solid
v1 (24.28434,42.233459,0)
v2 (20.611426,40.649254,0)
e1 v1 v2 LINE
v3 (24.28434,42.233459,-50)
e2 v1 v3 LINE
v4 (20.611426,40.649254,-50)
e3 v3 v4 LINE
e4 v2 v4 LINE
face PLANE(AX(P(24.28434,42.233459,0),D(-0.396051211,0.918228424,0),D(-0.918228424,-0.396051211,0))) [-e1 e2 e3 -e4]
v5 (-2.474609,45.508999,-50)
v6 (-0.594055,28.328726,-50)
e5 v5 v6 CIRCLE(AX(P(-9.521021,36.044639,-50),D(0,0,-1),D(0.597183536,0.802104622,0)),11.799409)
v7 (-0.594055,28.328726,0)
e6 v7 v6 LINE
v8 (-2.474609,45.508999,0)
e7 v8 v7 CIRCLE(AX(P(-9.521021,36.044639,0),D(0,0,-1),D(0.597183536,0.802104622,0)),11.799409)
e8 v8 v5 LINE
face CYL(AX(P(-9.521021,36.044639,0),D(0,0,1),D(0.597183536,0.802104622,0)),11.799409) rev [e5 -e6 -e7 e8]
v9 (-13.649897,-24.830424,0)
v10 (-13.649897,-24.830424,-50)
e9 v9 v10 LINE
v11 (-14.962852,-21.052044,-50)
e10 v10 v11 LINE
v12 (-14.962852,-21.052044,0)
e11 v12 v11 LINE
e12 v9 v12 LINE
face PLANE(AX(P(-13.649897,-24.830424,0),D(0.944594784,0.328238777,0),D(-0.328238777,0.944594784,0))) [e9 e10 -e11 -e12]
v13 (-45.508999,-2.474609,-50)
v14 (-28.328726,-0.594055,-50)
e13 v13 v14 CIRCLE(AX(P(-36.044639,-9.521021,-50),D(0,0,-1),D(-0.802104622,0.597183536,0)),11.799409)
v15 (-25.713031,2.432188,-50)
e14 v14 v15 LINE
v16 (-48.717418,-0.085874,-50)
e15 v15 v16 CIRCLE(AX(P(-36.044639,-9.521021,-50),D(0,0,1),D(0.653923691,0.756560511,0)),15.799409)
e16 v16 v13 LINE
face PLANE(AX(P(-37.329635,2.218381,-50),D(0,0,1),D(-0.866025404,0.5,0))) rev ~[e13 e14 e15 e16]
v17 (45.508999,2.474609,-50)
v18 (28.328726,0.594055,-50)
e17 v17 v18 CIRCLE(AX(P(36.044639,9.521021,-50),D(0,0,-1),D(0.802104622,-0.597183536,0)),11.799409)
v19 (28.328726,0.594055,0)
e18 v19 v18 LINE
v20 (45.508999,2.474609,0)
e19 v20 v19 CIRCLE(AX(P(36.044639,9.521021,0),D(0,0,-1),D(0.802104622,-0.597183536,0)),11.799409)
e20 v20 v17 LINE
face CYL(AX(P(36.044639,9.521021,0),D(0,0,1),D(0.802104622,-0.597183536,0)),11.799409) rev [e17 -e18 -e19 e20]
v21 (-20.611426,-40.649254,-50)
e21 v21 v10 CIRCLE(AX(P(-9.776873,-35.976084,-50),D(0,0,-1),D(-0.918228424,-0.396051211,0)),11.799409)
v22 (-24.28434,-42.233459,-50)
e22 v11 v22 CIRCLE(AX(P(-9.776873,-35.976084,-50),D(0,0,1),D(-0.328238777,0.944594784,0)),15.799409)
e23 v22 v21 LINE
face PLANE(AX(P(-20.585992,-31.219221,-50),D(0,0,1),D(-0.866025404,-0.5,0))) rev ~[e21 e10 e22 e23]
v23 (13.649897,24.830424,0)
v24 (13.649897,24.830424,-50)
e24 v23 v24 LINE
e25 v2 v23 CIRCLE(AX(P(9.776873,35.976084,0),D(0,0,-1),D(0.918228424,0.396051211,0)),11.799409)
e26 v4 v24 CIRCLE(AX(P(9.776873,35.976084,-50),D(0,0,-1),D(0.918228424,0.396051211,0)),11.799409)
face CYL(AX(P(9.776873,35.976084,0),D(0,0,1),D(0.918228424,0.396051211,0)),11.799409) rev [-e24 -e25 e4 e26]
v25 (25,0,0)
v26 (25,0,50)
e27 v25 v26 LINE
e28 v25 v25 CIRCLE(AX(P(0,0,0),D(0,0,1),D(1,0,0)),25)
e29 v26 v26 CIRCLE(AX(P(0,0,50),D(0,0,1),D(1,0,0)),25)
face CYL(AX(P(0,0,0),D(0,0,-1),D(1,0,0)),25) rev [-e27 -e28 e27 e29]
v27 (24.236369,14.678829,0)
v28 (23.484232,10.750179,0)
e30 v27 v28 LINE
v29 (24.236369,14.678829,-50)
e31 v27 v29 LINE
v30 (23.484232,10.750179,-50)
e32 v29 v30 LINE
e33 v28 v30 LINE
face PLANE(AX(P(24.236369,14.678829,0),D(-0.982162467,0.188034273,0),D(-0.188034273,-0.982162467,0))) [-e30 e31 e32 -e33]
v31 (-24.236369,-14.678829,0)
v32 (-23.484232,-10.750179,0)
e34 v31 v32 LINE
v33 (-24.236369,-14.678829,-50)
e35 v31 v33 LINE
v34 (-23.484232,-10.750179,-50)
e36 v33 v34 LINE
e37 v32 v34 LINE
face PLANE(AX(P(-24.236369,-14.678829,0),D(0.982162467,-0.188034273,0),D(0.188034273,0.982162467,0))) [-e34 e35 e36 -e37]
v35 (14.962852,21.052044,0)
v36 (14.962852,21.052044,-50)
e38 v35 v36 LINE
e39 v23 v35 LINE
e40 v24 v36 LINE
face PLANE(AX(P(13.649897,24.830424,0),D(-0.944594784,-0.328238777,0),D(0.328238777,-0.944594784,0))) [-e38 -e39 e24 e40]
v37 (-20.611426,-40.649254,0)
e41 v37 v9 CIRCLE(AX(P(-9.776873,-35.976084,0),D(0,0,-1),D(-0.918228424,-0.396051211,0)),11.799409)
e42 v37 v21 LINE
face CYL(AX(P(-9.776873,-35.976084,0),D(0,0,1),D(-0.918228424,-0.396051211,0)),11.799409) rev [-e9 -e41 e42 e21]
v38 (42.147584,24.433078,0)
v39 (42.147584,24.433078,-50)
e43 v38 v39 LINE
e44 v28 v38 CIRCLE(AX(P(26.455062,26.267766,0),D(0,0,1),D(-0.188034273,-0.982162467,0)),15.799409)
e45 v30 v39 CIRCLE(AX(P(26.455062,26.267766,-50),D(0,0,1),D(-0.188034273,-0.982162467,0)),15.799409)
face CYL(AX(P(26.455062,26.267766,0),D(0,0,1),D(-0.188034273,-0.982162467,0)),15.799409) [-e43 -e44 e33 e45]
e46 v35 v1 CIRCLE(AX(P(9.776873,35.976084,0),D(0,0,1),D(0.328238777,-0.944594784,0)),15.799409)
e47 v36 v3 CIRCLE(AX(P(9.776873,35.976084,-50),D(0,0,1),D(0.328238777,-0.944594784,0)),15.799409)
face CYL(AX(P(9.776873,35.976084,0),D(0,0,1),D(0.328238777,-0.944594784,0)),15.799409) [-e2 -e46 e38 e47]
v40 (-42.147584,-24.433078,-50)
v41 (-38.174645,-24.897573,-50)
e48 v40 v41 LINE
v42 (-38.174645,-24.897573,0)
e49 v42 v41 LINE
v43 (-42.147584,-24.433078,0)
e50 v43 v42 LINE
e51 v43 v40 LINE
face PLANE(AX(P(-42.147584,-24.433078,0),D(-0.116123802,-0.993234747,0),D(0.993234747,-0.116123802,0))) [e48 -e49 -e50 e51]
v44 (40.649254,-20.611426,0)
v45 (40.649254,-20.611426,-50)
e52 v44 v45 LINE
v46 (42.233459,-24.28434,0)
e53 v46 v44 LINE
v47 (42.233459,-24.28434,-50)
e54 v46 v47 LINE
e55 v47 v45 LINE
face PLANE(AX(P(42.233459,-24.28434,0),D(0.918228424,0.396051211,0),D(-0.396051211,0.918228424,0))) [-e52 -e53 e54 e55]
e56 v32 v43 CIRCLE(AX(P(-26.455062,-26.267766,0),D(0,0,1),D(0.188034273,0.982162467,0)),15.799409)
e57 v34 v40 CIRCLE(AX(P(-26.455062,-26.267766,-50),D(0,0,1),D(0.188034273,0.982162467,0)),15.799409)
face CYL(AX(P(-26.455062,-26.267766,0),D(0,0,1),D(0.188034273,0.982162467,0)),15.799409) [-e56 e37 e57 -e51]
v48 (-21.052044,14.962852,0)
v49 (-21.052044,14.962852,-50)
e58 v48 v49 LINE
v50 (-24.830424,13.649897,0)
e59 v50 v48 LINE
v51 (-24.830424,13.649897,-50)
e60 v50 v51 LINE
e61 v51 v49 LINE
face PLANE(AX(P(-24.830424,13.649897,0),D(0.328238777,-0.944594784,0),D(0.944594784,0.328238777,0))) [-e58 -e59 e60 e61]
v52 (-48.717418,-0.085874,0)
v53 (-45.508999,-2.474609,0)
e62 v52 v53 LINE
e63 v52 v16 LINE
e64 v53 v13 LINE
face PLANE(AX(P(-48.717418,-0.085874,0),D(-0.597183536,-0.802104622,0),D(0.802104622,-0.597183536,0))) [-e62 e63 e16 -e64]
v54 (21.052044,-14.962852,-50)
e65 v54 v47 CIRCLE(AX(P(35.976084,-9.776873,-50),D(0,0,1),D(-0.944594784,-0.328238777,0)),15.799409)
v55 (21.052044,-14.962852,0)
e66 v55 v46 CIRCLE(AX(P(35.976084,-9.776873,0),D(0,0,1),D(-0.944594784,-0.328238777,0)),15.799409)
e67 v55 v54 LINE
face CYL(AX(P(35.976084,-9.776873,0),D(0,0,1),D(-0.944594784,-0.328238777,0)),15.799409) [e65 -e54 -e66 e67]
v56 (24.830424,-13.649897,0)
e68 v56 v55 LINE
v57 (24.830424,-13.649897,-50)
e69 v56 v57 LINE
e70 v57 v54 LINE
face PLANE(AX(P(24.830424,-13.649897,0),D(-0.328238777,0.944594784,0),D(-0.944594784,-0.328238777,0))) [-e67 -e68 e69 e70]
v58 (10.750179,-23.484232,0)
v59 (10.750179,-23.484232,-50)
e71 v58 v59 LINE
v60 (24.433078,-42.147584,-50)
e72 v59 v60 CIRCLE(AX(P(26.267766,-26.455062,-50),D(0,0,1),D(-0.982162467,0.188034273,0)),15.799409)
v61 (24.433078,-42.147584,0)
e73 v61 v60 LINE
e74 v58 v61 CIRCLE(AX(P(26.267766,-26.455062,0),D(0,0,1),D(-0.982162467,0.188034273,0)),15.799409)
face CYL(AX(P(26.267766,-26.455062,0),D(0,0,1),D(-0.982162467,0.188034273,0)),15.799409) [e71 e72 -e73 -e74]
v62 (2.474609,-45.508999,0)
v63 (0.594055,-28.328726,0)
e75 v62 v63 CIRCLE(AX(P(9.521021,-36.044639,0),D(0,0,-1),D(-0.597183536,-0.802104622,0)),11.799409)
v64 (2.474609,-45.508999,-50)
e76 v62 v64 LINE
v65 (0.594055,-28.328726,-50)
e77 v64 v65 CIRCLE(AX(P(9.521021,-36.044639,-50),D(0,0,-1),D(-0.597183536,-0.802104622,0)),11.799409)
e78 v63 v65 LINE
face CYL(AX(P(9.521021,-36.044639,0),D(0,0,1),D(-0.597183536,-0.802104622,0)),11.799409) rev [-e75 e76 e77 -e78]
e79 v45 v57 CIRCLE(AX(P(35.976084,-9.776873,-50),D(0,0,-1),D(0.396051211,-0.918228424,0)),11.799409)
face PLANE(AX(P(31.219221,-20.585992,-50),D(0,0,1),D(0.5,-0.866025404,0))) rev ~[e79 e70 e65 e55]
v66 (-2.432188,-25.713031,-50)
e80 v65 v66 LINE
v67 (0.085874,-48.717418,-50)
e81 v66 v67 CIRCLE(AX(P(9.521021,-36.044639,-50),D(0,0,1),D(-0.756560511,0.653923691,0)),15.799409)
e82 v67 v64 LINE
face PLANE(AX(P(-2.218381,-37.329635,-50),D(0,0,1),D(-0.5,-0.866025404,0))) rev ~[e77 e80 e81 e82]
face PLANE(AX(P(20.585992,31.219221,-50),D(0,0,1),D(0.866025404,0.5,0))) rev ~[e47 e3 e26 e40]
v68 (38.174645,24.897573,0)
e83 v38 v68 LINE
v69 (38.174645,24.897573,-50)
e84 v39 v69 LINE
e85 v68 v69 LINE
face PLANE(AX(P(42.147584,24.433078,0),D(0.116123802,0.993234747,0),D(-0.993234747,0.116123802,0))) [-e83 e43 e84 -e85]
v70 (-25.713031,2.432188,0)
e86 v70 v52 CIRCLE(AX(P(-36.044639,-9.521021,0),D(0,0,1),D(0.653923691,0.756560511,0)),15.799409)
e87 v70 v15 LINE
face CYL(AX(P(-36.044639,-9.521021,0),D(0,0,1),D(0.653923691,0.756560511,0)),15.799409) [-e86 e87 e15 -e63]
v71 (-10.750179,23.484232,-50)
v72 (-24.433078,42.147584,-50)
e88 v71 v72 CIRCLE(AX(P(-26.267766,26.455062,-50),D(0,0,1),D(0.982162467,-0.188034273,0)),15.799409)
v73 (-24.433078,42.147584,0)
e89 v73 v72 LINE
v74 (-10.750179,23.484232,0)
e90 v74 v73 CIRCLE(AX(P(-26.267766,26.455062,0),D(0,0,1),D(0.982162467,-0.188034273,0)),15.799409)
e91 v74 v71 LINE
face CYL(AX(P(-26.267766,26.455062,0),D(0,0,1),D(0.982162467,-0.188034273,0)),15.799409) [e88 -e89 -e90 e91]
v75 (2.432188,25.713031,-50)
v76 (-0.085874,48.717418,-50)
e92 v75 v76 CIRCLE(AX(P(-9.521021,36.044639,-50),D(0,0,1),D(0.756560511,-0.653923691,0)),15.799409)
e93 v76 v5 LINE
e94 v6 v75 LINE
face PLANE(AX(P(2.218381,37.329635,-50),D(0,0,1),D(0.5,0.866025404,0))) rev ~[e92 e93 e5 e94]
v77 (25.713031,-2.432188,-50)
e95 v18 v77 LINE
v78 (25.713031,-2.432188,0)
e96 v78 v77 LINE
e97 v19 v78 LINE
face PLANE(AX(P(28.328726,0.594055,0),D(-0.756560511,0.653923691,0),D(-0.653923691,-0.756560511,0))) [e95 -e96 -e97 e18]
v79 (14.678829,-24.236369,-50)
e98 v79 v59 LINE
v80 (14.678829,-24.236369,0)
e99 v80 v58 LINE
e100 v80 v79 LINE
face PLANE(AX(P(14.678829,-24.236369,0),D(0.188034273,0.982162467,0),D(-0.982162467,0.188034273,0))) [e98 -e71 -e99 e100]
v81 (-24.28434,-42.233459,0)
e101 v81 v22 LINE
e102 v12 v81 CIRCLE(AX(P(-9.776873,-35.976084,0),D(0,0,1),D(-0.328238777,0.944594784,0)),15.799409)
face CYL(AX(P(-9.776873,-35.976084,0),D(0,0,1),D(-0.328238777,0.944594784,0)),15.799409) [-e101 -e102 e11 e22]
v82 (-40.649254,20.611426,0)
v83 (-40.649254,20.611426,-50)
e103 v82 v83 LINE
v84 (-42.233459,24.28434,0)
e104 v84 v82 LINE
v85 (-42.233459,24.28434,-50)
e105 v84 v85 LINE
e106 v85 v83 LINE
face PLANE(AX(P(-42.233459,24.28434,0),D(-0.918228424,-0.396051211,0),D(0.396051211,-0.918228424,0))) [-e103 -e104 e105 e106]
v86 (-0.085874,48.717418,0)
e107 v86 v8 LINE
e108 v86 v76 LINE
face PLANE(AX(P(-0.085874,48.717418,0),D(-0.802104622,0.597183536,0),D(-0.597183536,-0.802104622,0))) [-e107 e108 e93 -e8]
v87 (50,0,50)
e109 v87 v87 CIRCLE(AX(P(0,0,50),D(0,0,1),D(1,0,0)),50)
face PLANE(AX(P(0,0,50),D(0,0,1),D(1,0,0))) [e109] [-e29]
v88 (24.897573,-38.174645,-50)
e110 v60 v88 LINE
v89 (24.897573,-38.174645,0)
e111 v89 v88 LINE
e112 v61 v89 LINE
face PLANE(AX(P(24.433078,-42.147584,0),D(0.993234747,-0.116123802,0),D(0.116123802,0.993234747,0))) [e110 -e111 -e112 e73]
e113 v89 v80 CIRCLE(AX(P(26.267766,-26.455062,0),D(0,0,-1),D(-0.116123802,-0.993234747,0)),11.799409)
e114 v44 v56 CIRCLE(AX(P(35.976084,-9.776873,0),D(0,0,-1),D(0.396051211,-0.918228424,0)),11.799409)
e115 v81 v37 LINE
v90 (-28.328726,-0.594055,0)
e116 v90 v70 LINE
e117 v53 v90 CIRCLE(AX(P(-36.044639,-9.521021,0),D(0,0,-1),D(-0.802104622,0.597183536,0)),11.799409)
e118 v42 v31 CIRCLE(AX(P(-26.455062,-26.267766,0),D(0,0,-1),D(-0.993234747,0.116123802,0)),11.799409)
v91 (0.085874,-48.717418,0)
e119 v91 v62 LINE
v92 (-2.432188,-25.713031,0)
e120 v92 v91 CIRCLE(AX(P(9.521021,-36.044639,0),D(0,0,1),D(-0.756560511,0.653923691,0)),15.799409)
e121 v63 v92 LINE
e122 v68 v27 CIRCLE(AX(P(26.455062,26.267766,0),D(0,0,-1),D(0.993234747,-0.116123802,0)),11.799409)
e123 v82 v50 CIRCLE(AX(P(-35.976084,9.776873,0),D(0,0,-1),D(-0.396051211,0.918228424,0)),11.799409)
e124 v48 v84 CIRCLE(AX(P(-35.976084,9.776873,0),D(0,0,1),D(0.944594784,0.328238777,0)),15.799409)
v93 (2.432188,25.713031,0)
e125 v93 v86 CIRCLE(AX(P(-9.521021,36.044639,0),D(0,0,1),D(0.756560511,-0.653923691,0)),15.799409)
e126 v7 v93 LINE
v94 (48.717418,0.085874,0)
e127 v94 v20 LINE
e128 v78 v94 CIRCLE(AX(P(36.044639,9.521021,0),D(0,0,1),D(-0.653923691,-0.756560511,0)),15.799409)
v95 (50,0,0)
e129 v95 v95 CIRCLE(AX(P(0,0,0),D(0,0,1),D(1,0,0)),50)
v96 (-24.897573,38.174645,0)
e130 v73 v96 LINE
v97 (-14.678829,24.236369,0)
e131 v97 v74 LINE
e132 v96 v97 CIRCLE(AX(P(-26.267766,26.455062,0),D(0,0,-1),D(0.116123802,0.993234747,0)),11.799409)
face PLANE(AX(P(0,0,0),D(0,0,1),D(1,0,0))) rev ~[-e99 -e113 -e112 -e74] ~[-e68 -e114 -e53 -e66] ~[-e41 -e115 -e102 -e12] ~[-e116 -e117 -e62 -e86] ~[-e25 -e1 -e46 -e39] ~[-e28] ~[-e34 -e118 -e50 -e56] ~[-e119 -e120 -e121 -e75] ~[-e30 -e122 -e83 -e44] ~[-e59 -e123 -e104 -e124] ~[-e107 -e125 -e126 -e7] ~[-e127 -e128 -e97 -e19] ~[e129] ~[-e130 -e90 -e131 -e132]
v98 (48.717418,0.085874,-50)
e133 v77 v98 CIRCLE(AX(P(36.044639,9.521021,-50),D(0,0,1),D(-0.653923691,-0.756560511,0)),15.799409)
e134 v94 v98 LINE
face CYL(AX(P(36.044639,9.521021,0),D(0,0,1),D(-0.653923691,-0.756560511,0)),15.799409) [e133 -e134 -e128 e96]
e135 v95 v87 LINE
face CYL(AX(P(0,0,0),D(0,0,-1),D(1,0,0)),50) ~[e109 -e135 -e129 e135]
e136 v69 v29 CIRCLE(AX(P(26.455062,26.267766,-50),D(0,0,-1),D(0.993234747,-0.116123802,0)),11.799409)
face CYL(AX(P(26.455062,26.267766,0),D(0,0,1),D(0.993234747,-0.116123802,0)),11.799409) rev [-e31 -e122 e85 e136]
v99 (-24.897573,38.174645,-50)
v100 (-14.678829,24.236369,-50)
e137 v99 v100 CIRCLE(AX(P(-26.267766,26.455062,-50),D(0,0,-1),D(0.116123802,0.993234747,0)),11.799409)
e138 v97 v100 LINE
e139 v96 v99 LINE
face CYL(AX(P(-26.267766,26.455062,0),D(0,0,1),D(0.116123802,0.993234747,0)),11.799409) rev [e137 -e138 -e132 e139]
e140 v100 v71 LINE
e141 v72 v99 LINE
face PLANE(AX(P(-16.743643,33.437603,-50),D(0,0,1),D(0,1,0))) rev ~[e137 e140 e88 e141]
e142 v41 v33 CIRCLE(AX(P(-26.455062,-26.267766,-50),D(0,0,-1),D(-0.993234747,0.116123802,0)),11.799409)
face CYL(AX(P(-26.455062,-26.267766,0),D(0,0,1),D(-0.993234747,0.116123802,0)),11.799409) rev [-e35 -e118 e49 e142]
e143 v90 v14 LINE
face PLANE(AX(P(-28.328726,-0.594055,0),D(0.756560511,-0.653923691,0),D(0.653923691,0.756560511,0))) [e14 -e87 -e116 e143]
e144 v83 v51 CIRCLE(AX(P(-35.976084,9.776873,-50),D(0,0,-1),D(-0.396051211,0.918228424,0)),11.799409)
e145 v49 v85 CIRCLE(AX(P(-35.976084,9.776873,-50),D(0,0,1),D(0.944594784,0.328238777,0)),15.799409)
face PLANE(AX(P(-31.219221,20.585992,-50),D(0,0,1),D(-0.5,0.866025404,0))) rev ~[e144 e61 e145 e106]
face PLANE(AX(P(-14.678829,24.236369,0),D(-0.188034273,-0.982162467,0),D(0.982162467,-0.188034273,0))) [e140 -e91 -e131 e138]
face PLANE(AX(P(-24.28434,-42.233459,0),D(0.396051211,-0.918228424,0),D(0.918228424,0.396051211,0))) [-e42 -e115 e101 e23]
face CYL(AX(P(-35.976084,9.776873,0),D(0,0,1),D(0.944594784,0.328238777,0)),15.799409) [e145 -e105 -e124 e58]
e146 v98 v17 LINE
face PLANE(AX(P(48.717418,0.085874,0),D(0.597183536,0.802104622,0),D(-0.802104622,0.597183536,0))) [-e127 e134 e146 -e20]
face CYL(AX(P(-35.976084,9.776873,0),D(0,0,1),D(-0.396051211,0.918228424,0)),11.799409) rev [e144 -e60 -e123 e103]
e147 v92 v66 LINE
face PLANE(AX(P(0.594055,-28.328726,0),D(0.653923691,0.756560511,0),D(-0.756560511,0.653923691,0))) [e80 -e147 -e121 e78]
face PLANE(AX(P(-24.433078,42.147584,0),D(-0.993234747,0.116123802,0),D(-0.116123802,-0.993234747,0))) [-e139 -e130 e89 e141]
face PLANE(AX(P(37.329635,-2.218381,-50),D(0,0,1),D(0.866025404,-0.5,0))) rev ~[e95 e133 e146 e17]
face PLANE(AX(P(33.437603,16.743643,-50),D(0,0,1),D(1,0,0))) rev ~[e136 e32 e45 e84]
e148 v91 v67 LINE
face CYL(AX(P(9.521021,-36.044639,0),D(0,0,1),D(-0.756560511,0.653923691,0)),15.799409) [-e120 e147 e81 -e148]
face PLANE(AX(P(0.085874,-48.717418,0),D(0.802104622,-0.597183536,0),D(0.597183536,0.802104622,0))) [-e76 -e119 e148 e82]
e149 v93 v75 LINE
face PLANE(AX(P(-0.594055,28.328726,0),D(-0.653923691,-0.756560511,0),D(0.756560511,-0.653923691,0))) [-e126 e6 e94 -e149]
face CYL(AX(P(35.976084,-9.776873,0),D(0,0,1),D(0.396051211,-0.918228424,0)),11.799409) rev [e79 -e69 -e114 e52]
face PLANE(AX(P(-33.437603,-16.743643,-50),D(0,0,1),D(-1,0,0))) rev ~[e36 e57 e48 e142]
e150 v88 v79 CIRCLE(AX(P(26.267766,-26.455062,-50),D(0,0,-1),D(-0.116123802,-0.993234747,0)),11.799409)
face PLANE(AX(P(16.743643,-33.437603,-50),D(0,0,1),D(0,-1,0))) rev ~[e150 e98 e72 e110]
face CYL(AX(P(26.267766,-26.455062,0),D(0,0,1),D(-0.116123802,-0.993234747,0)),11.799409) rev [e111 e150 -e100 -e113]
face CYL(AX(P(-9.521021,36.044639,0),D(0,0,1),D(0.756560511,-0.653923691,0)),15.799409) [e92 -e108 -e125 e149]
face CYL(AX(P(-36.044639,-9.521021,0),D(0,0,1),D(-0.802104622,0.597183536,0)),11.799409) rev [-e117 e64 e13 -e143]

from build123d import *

# Parameters (mm, degrees)
F0_R            = 50
F1_DEPTH        = 50
F2_R            = 25
F3_DEPTH        = 50
F5_DEPTH        = 50
F5_COPIES_COUNT = 12


# Not quite as in the source:
# - a pattern or mirror of a feature is missing from the dataset's text; its kind, count and spacing are read off the source's solid


with BuildPart() as f1:
    # F0 (on Top) → F1 (new body)
    with BuildSketch(Plane.XY):
        Circle(F0_R)
    extrude(amount=F1_DEPTH)

    # F2 (on Top) → F3 (cut)
    with BuildSketch(Plane.XY):
        Circle(F2_R)
    extrude(amount=F3_DEPTH, mode=Mode.SUBTRACT)

    # F4 (on Top) → F5 (join)
    with BuildSketch(Plane.XY):
        with BuildLine():
            Line((24.2363690546, 14.6788293603), (23.4842319041, 10.750179179))
            ThreePointArc((23.4842319041, 10.750179179), (35.7966783621, 13.5258846201), (42.1475842595, 24.4330782443))
            Line((42.1475842595, 24.4330782443), (38.1746449562, 24.8975734892))
            ThreePointArc((38.1746449562, 24.8975734892), (33.4316236094, 16.7517982205), (24.2363690546, 14.6788293603))
        make_face()
    f5 = extrude(amount=-F5_DEPTH)

    # F5_copies: F5 ×12 about axis
    f5_copies_axis = Axis((0, 0, 0), (0, 0, 1))
    for i in range(1, F5_COPIES_COUNT):
        add(f5.rotate(f5_copies_axis, i * 360 / F5_COPIES_COUNT))


solid = f1.part
